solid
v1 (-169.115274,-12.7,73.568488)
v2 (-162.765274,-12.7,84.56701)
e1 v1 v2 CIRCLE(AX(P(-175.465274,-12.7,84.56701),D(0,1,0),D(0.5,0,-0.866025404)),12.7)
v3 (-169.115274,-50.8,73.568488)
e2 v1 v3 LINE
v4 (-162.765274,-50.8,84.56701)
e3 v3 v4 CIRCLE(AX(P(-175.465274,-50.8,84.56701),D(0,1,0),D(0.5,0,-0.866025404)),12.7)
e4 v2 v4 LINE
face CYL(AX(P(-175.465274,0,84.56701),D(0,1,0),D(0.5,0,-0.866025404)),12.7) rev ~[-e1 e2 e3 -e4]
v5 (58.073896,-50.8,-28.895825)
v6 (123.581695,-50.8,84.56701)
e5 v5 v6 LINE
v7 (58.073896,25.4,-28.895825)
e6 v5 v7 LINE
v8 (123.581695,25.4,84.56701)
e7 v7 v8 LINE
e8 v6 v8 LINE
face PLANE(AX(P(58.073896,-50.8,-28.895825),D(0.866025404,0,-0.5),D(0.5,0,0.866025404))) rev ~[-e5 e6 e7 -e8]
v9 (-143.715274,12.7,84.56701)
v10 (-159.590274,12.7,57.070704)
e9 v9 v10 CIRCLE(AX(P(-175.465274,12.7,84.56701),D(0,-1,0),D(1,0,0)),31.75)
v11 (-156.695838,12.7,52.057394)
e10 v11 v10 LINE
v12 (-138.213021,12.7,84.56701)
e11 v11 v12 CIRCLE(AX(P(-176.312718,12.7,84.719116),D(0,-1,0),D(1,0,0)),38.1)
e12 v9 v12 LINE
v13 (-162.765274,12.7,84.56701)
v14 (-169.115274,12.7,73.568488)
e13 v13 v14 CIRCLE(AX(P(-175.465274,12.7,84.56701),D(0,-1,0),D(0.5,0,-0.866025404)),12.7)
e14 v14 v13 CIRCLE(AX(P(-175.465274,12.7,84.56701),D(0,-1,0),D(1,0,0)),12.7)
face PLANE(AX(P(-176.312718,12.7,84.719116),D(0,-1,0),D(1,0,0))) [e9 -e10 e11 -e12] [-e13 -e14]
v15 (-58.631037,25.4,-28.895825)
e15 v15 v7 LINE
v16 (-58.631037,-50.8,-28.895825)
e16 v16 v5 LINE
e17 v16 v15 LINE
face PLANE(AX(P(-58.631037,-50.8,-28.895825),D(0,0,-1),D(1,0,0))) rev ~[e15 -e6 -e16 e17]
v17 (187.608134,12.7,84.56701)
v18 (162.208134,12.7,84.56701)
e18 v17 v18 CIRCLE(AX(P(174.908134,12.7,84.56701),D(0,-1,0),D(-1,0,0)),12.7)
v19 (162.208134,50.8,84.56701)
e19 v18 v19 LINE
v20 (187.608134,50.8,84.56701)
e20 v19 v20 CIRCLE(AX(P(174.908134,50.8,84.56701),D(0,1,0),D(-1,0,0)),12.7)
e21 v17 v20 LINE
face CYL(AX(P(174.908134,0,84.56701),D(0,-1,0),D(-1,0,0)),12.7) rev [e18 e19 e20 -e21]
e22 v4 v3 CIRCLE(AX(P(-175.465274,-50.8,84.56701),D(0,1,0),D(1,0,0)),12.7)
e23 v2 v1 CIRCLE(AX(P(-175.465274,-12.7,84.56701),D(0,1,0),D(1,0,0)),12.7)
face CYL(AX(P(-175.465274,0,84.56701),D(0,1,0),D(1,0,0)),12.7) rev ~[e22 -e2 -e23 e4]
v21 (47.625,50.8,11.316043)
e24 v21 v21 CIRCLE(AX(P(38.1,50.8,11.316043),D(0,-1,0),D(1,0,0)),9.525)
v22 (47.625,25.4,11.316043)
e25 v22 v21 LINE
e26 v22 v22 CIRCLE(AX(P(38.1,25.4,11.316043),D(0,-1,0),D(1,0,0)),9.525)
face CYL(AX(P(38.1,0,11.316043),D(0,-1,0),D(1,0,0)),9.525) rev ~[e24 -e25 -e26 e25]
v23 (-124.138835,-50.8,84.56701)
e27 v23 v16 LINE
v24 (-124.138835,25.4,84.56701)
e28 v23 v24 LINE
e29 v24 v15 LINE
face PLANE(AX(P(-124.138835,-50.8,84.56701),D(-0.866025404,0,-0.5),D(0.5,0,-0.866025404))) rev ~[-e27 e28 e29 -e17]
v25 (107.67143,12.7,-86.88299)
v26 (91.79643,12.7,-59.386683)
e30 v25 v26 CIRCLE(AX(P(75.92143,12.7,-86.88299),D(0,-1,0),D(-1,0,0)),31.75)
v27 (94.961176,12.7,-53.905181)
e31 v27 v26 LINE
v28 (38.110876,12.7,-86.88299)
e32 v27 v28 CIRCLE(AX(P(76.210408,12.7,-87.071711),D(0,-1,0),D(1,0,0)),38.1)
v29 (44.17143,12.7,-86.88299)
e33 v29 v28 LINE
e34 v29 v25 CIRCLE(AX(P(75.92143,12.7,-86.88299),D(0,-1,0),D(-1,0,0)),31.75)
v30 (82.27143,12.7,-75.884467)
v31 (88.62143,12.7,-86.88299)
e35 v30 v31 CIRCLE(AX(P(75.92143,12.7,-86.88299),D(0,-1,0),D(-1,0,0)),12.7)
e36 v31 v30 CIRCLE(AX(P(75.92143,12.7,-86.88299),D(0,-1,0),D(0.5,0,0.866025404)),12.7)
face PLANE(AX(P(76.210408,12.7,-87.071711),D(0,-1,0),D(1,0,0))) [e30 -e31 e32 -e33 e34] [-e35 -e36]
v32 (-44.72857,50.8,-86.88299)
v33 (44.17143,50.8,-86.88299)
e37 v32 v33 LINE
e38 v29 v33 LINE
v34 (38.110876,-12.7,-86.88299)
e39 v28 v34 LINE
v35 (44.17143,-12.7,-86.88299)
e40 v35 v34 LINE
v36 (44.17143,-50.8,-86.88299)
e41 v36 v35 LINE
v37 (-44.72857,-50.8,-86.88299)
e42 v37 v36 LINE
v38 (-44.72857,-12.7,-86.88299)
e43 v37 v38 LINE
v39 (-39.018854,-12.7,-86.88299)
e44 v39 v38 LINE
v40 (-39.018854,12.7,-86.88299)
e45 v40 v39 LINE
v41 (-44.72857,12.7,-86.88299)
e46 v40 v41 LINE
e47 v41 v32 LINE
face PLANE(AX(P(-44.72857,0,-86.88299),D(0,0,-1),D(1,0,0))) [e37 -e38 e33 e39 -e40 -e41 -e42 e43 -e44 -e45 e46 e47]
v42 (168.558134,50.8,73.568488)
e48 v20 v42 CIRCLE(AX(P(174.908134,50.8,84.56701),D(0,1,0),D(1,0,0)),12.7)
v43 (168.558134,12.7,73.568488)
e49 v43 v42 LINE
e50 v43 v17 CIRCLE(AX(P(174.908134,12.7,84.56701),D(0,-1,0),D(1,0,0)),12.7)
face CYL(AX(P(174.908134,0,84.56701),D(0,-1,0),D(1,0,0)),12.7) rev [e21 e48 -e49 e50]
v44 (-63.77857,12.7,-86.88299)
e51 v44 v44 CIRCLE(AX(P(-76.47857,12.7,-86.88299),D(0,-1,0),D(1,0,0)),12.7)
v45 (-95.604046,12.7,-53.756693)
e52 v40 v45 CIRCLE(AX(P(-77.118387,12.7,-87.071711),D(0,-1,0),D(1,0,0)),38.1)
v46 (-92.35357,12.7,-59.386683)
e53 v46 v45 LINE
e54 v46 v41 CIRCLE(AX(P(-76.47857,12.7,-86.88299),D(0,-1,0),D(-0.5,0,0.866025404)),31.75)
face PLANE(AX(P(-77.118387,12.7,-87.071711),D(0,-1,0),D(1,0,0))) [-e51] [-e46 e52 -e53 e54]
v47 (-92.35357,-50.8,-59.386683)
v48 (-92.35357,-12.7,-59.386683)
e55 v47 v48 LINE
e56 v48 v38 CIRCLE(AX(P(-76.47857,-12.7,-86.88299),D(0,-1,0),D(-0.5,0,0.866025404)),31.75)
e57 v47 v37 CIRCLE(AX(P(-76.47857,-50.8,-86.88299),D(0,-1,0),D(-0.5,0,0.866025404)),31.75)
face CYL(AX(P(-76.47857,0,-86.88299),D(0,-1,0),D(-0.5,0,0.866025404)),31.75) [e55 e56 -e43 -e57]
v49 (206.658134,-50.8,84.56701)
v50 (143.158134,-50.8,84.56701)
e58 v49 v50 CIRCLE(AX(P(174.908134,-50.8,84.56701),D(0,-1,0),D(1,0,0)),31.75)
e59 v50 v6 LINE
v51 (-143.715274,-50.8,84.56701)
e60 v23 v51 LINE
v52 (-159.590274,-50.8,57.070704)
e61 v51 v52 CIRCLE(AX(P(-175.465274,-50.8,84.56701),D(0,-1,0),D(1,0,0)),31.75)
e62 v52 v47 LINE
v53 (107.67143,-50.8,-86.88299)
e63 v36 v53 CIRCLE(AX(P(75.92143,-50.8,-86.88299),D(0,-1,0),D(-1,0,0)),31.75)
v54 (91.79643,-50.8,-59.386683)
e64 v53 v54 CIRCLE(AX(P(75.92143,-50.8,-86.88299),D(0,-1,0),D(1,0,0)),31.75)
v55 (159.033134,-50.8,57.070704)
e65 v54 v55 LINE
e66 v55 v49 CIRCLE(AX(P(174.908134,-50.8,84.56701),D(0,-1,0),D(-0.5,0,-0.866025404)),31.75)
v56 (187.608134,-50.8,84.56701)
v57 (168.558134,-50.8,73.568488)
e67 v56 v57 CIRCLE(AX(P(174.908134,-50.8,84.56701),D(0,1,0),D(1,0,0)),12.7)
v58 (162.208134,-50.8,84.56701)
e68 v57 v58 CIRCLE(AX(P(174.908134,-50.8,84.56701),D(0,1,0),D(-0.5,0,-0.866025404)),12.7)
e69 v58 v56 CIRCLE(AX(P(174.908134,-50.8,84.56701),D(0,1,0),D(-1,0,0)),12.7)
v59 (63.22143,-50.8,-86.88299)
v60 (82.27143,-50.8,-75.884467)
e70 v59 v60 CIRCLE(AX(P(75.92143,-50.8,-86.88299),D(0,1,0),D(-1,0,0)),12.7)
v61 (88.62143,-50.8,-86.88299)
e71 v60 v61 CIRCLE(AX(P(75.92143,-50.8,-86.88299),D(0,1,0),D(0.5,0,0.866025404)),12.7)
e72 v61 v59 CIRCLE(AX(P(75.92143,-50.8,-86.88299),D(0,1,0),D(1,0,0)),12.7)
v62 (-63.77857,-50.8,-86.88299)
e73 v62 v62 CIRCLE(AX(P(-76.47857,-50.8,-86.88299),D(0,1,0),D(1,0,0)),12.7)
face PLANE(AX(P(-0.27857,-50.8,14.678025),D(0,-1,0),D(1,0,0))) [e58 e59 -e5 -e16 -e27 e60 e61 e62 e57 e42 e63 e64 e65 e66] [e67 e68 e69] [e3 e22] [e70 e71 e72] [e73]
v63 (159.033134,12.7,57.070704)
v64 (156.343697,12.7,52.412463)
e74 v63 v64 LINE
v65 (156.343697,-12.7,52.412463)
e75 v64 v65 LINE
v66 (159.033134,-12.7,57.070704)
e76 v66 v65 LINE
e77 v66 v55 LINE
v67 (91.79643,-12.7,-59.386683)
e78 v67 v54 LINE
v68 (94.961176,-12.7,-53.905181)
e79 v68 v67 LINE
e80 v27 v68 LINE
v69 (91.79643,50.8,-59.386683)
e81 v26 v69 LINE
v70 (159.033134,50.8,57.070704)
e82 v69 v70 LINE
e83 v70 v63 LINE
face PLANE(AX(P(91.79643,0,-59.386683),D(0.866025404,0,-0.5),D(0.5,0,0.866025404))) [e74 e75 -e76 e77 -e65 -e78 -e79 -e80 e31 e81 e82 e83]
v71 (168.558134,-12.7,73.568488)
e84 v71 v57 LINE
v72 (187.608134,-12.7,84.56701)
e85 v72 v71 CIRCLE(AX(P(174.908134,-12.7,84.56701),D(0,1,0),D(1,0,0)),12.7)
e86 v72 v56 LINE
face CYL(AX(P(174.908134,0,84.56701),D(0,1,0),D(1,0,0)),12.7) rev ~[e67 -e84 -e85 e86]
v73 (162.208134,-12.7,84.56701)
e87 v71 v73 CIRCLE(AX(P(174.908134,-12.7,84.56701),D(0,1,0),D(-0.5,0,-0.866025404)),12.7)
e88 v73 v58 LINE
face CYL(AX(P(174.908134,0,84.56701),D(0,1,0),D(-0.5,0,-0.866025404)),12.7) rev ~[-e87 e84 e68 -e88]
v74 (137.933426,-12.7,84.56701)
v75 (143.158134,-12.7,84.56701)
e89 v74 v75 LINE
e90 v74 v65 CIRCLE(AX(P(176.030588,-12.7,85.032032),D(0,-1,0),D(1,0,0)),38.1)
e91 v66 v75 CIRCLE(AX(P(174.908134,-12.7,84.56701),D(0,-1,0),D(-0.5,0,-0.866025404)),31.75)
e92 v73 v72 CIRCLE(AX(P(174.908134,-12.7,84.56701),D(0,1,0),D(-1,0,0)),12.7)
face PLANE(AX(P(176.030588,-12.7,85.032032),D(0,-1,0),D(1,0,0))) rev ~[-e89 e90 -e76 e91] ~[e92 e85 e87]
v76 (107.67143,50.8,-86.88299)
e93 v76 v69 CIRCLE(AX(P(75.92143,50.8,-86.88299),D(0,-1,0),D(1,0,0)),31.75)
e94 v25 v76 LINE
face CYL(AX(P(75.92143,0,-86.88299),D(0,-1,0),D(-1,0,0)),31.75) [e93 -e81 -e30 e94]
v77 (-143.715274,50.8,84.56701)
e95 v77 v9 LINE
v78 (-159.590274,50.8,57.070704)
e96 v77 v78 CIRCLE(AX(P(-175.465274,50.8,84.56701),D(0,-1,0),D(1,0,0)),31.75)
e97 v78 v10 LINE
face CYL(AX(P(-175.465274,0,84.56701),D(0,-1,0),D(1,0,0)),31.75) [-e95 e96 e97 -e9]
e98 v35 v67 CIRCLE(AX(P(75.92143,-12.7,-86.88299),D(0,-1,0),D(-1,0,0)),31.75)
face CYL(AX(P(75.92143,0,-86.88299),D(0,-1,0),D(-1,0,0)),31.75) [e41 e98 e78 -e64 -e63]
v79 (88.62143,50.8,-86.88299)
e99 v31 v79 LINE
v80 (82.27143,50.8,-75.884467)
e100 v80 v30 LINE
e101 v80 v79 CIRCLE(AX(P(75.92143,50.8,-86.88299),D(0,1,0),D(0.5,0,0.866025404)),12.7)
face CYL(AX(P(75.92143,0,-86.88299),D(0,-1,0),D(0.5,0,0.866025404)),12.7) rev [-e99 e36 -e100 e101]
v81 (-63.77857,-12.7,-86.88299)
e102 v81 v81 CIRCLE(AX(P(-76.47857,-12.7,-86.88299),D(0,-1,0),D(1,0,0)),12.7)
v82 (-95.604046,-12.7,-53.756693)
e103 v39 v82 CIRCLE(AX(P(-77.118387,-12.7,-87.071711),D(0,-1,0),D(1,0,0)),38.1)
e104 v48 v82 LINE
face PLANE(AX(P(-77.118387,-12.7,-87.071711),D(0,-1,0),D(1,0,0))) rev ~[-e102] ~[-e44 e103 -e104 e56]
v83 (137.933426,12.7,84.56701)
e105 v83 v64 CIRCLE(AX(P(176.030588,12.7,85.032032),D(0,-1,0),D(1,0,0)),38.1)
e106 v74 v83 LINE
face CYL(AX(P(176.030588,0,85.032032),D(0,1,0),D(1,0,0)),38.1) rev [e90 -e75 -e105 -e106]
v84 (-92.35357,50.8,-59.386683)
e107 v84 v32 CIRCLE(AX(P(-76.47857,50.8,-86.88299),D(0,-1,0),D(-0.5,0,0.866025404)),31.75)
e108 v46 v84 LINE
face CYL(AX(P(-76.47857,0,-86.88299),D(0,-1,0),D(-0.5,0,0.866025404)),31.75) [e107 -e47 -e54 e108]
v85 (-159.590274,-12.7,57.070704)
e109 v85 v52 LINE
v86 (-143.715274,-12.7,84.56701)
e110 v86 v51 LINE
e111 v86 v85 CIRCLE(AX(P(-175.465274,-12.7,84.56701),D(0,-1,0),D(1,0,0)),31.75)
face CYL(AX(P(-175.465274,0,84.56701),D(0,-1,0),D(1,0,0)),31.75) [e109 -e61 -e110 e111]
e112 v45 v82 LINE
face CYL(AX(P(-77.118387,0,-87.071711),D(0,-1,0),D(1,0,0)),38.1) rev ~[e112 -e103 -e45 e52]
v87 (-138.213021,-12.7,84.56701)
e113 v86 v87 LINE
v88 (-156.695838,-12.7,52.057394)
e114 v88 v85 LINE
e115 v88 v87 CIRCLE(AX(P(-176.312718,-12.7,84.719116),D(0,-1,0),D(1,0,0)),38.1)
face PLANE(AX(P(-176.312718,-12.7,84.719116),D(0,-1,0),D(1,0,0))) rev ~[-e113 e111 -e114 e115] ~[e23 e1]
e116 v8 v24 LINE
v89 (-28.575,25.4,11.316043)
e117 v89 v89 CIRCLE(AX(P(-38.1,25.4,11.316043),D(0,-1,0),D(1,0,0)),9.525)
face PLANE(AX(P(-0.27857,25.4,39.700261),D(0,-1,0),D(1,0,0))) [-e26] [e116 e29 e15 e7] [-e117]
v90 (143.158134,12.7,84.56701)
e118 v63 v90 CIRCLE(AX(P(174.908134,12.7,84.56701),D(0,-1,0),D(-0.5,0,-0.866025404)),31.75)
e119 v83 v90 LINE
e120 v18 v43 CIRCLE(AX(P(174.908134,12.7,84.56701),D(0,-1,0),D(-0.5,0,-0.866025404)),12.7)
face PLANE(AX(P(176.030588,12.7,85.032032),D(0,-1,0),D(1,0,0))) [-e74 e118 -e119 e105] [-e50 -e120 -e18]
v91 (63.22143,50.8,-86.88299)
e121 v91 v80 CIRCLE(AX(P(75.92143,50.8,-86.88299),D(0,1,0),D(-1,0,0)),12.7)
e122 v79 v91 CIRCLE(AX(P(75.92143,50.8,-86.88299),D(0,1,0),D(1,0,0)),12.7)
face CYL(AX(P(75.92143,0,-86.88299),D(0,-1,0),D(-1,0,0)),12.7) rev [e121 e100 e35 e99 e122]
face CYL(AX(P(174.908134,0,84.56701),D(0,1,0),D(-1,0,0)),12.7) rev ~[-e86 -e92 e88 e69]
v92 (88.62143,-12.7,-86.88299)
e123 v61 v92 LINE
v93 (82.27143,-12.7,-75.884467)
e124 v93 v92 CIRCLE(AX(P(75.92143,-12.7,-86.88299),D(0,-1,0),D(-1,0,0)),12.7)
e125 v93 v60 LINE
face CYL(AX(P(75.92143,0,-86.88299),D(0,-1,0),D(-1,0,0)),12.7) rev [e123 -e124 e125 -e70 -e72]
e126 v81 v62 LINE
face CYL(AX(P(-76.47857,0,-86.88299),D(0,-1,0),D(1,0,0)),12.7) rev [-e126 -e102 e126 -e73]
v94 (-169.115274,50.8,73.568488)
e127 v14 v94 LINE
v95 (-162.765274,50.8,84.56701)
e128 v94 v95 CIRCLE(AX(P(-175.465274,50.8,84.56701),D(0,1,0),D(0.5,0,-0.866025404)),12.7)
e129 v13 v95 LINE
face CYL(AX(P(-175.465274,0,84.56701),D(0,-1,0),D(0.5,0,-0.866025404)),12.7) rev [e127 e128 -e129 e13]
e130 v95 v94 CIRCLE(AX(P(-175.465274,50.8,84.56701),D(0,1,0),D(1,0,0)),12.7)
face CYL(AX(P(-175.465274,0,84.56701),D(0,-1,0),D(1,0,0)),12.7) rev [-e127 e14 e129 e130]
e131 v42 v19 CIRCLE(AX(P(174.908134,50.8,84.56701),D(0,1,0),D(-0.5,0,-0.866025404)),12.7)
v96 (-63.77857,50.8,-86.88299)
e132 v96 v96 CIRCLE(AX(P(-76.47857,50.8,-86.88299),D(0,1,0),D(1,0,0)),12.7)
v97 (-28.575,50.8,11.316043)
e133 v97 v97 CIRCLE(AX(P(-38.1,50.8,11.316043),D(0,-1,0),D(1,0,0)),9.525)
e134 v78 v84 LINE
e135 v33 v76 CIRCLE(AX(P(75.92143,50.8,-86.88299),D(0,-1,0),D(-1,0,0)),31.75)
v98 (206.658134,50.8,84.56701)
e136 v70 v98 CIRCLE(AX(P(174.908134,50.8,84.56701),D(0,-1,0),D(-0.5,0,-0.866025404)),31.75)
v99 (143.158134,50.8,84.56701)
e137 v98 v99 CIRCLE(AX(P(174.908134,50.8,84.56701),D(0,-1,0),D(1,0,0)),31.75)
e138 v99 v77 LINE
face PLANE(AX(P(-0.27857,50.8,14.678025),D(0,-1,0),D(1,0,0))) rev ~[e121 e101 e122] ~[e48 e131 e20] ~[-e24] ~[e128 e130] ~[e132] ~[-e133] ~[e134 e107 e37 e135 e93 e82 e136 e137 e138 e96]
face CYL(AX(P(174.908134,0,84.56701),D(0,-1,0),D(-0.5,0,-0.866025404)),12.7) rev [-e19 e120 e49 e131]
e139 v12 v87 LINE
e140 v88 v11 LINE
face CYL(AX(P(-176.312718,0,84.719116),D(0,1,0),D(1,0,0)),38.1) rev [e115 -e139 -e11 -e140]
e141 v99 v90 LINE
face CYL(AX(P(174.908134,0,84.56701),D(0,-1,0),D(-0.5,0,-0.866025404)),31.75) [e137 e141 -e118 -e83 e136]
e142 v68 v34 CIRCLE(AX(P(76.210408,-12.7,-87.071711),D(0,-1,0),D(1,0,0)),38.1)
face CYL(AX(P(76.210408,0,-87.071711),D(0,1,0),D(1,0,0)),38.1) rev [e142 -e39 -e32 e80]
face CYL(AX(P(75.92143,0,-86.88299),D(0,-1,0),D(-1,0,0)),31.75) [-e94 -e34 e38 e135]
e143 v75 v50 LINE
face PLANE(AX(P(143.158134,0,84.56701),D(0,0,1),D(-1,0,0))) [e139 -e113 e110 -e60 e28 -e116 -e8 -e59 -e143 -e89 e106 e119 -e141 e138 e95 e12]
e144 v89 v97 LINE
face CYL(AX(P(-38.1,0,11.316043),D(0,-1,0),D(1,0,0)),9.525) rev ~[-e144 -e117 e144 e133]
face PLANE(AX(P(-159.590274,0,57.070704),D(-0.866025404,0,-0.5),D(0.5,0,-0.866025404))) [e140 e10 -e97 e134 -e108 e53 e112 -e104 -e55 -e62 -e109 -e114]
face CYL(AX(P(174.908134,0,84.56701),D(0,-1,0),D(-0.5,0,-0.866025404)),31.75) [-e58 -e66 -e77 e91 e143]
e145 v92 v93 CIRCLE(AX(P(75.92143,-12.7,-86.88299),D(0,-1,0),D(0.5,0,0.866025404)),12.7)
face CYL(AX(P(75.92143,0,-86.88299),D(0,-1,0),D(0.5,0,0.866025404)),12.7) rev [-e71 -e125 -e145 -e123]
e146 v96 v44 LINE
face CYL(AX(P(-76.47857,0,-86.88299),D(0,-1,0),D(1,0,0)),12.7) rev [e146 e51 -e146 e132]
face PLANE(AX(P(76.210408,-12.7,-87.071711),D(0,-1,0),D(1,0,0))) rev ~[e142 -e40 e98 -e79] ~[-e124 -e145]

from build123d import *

# Parameters (mm, degrees)
F1_DEPTH = 50.8
F3_DEPTH = 76.2
F4_R     = 38.1
F5_DEPTH = 12.7
F7_R     = 9.525
F8_DEPTH = 50.801


with BuildPart() as f1:
    # F0 (on Front) → F1 (new body, symmetric)
    with BuildSketch(Plane.XZ):
        with BuildLine():
            ThreePointArc((-92.3535701347, -59.3866830272), (-60.6035701347, -59.3866830272), (-44.7285701347, -86.8829895973))
            Line((-44.7285701347, -86.8829895973), (44.1714298653, -86.8829895973))
            ThreePointArc((44.1714298653, -86.8829895973), (60.0464298653, -59.3866830272), (91.7964298653, -59.3866830272))
            Line((91.7964298653, -59.3866830272), (159.0331335179, 57.0707038325))
            ThreePointArc((159.0331335179, 57.0707038325), (147.4118269477, 68.6920104027), (143.1581335179, 84.5670104027))
            Line((143.1581335179, 84.5670104027), (-143.7152737873, 84.5670104027))
            ThreePointArc((-143.7152737873, 84.5670104027), (-147.9689672171, 68.6920104027), (-159.5902737873, 57.0707038325))
            Line((-159.5902737873, 57.0707038325), (-92.3535701347, -59.3866830272))
        make_face()
        with BuildLine():
            ThreePointArc((-143.7152737873, 84.5670104027), (-202.9615803574, 100.4420104027), (-159.5902737873, 57.0707038325))
            Line((-159.5902737873, 57.0707038325), (-169.1152737873, 73.5684877746))
            ThreePointArc((-169.1152737873, 73.5684877746), (-186.4637964153, 90.9170104027), (-162.7652737873, 84.5670104027))
            Line((-162.7652737873, 84.5670104027), (-143.7152737873, 84.5670104027))
        make_face()
        with BuildLine():
            Line((-169.1152737873, 73.5684877746), (-159.5902737873, 57.0707038325))
            ThreePointArc((-159.5902737873, 57.0707038325), (-147.9689672171, 68.6920104027), (-143.7152737873, 84.5670104027))
            Line((-143.7152737873, 84.5670104027), (-162.7652737873, 84.5670104027))
            ThreePointArc((-162.7652737873, 84.5670104027), (-164.4667511592, 78.2170104027), (-169.1152737873, 73.5684877746))
        make_face()
        with BuildLine():
            ThreePointArc((143.1581335179, 84.5670104027), (147.4118269477, 68.6920104027), (159.0331335179, 57.0707038325))
            Line((159.0331335179, 57.0707038325), (168.5581335179, 73.5684877746))
            ThreePointArc((168.5581335179, 73.5684877746), (163.9096108898, 78.2170104027), (162.2081335179, 84.5670104027))
            Line((162.2081335179, 84.5670104027), (143.1581335179, 84.5670104027))
        make_face()
        with BuildLine():
            Line((168.5581335179, 73.5684877746), (159.0331335179, 57.0707038325))
            ThreePointArc((159.0331335179, 57.0707038325), (190.7831335179, 57.0707038325), (206.6581335179, 84.5670104027))
            ThreePointArc((206.6581335179, 84.5670104027), (174.9081335179, 116.3170104027), (143.1581335179, 84.5670104027))
            Line((143.1581335179, 84.5670104027), (162.2081335179, 84.5670104027))
            ThreePointArc((162.2081335179, 84.5670104027), (174.9081335179, 97.2670104027), (187.6081335179, 84.5670104027))
            ThreePointArc((187.6081335179, 84.5670104027), (181.2581335179, 73.5684877746), (168.5581335179, 73.5684877746))
        make_face()
        with BuildLine():
            ThreePointArc((91.7964298653, -59.3866830272), (60.0464298653, -59.3866830272), (44.1714298653, -86.8829895973))
            Line((44.1714298653, -86.8829895973), (63.2214298653, -86.8829895973))
            ThreePointArc((63.2214298653, -86.8829895973), (69.5714298653, -75.8844669693), (82.2714298653, -75.8844669693))
            Line((82.2714298653, -75.8844669693), (91.7964298653, -59.3866830272))
        make_face()
        with BuildLine():
            Line((63.2214298653, -86.8829895973), (44.1714298653, -86.8829895973))
            ThreePointArc((44.1714298653, -86.8829895973), (75.9214298653, -118.6329895973), (107.6714298653, -86.8829895973))
            ThreePointArc((107.6714298653, -86.8829895973), (103.4177364354, -71.0079895973), (91.7964298653, -59.3866830272))
            Line((91.7964298653, -59.3866830272), (82.2714298653, -75.8844669693))
            ThreePointArc((82.2714298653, -75.8844669693), (86.9199524934, -80.5329895973), (88.6214298653, -86.8829895973))
            ThreePointArc((88.6214298653, -86.8829895973), (75.9214298653, -99.5829895973), (63.2214298653, -86.8829895973))
        make_face()
        with BuildLine():
            ThreePointArc((-82.8285701347, -75.8844669693), (-70.1285701347, -75.8844669693), (-63.7785701347, -86.8829895973))
            Line((-63.7785701347, -86.8829895973), (-44.7285701347, -86.8829895973))
            ThreePointArc((-44.7285701347, -86.8829895973), (-60.6035701347, -59.3866830272), (-92.3535701347, -59.3866830272))
            Line((-92.3535701347, -59.3866830272), (-82.8285701347, -75.8844669693))
        make_face()
        with BuildLine():
            Line((-44.7285701347, -86.8829895973), (-63.7785701347, -86.8829895973))
            ThreePointArc((-63.7785701347, -86.8829895973), (-82.8285701347, -97.8815122254), (-82.8285701347, -75.8844669693))
            Line((-82.8285701347, -75.8844669693), (-92.3535701347, -59.3866830272))
            ThreePointArc((-92.3535701347, -59.3866830272), (-92.3535701347, -114.3792961675), (-44.7285701347, -86.8829895973))
        make_face()
    extrude(amount=F1_DEPTH, both=True)

    # F2 (on face) → F3 (cut)
    with BuildSketch(Plane.XZ.offset(50.8)):
        Polygon((123.5816945869, 84.5670104027), (-124.1388348563, 84.5670104027), (-58.6310365333, -28.8958245848), (58.0738962639, -28.8958245848), align=None)
    extrude(amount=-F3_DEPTH, mode=Mode.SUBTRACT)

    # F4 (on Front) → F5 (cut, symmetric)
    with BuildSketch(Plane.XZ):
        with Locations((-176.3127177301, 84.7191157899)):
            Circle(F4_R)
        with Locations((176.0305875596, 85.0320324617)):
            Circle(F4_R)
        with Locations((76.2104084713, -87.0717109253)):
            Circle(F4_R)
        with Locations((-77.118386936, -87.0717109253)):
            Circle(F4_R)
    extrude(amount=F5_DEPTH, both=True, mode=Mode.SUBTRACT)

    # F7 (on face) → F8 (cut, through all)
    with BuildSketch(Plane.XZ):
        with Locations((-38.1, 11.3160433248)):
            Circle(F7_R)
        with Locations((38.1, 11.3160433248)):
            Circle(F7_R)
    extrude(amount=-F8_DEPTH, mode=Mode.SUBTRACT)


solid = f1.part
